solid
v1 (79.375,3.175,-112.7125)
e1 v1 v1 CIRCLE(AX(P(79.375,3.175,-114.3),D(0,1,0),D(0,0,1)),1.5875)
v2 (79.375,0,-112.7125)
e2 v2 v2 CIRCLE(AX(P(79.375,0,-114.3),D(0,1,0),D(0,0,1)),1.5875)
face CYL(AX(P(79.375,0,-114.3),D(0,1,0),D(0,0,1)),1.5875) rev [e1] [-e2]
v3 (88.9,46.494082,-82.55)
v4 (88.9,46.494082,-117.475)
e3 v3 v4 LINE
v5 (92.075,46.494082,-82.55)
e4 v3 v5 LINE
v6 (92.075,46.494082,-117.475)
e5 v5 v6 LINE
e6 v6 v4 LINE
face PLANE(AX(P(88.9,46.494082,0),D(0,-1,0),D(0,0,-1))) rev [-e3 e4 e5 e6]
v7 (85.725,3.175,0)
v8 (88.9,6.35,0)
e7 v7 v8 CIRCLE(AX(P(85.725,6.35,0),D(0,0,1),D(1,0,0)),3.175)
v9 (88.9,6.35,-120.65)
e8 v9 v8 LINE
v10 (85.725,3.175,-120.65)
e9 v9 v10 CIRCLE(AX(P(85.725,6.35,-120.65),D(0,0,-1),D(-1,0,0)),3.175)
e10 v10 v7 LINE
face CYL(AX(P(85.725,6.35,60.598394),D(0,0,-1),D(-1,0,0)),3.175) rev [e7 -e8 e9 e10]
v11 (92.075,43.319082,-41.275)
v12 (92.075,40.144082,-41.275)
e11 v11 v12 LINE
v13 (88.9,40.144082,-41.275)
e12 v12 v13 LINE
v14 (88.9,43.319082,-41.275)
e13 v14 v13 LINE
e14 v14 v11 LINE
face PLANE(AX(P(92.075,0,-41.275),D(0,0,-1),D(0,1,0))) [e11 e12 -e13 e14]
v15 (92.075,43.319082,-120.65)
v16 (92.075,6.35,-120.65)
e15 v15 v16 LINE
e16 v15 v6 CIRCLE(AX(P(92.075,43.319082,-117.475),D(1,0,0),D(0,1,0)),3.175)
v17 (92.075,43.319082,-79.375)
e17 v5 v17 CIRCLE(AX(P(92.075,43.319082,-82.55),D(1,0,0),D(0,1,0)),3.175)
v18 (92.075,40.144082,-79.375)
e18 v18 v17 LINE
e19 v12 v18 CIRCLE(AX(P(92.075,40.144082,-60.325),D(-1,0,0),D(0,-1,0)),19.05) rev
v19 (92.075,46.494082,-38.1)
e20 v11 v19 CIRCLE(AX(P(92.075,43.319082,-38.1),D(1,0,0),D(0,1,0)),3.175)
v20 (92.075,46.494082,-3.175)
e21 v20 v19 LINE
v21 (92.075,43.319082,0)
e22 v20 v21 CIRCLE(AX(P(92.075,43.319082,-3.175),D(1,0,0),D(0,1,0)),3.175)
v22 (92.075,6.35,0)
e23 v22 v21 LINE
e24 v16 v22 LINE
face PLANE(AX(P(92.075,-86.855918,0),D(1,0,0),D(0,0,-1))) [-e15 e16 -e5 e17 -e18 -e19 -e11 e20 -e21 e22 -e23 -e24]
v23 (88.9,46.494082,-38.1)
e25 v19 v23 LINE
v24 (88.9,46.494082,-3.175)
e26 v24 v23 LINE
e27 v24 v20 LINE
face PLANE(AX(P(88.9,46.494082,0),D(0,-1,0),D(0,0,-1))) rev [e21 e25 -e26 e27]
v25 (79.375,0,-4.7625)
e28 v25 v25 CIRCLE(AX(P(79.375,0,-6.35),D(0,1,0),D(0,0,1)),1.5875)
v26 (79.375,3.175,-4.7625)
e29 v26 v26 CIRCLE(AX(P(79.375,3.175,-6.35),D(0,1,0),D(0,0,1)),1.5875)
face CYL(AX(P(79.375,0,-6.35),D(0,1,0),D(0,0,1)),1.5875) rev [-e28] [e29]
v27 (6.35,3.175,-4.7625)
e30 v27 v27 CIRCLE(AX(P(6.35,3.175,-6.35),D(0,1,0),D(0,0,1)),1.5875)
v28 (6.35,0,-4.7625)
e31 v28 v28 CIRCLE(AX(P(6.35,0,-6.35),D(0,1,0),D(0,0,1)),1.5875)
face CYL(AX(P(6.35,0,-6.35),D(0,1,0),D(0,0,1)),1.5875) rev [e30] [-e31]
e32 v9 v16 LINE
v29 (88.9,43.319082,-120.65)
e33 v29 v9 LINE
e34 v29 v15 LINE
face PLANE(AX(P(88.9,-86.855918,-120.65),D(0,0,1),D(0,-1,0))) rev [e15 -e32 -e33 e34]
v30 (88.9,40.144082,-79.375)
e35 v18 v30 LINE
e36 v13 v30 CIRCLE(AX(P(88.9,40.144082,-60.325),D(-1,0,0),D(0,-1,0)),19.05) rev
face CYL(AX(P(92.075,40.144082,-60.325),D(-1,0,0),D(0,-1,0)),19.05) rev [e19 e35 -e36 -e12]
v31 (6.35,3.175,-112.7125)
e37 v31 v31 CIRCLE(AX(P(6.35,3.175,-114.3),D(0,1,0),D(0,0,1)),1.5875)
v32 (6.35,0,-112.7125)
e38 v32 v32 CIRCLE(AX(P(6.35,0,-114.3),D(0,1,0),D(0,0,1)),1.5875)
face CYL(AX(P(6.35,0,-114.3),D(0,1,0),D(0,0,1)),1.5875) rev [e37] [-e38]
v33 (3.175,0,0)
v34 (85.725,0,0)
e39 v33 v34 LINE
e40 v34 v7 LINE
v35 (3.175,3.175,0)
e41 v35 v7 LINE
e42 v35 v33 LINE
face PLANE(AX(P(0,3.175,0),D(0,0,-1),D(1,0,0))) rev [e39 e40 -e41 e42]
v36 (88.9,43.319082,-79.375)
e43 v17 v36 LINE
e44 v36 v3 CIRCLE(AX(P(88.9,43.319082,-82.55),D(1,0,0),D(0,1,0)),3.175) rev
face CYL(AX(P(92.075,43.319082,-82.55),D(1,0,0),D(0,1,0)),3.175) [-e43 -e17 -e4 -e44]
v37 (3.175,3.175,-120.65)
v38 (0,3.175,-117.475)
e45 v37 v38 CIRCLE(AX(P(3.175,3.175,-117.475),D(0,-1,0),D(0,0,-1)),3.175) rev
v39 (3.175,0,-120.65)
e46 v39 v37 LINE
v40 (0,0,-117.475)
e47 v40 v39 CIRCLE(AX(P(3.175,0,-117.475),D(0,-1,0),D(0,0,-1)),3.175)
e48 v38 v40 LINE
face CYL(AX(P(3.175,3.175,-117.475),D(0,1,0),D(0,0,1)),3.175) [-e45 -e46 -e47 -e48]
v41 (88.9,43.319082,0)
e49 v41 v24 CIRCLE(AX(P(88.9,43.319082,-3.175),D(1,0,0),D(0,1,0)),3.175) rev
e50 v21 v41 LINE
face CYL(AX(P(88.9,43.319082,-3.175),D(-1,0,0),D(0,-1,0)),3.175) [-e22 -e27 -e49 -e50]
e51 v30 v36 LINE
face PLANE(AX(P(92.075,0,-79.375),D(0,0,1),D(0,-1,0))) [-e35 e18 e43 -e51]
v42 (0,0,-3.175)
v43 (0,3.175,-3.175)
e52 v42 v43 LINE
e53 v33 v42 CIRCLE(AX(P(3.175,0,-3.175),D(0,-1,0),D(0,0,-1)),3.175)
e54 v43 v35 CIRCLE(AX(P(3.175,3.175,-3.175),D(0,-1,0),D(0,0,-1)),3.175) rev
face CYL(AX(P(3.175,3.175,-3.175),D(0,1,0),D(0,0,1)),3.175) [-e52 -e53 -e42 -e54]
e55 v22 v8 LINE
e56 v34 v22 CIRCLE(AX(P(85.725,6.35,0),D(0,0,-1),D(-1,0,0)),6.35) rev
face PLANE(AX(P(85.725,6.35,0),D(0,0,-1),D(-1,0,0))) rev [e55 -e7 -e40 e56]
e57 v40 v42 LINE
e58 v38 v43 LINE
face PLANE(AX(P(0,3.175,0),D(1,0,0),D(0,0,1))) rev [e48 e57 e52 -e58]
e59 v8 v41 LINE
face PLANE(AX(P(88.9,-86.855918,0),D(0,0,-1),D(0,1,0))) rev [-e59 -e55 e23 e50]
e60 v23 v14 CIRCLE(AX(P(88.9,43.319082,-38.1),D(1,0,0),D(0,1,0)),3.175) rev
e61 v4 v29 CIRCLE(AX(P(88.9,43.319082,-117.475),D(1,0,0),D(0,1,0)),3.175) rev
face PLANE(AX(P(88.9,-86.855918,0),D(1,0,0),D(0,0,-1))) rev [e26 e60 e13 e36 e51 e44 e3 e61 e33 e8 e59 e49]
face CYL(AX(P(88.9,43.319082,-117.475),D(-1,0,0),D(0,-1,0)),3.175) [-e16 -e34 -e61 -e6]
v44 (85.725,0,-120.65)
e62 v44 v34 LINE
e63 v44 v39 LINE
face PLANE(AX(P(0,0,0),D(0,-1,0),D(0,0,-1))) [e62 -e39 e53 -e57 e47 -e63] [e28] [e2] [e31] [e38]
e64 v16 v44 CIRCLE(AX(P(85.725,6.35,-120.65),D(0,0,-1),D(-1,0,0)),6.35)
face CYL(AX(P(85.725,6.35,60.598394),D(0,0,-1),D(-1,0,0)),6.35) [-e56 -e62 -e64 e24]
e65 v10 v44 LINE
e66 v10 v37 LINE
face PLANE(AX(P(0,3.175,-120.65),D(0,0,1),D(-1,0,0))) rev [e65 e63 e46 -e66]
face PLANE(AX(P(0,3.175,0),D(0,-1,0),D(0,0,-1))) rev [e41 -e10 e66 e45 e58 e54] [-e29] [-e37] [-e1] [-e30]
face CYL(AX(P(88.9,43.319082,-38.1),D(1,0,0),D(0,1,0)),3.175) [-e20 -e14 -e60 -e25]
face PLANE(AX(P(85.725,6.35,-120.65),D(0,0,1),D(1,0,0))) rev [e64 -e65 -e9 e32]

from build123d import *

# Parameters (mm, degrees)
SKETCH1_W              = 133.35
SKETCH1_H              = 120.65
BOSS_EXTRUDE1_DEPTH    = 3.175
SKETCHED_START         = -120.65
SKETCHED_BEND1_DEPTH   = 120.65
SKETCHED_BEND1_2_DEPTH = 120.65
CUT_EXTRUDE1_DEPTH     = 157.911861269
SKETCH9_R              = 1.5875
CUT_EXTRUDE2_DEPTH     = 158.831464015
FILLET1_R              = 3.175


# Read off the part's stored shape, not the designer's step: Sketched Bend1
with BuildPart() as part:
    # Sketch1 → Boss-Extrude1 (new body)
    with BuildSketch(Plane(origin=(0, 0, 0), x_dir=(1, 0, 0), z_dir=(0, 1, 0))):
        with Locations((66.675, 60.325)):
            Rectangle(SKETCH1_W, SKETCH1_H)
    extrude(amount=BOSS_EXTRUDE1_DEPTH)

    # Sketched Bend1 outline → Sketched Bend1 (cut)
    with BuildSketch(Plane.XY.offset(SKETCHED_START)):
        with BuildLine():
            Line((133.35, 3.175), (91.224261315, 3.175))
            ThreePointArc((91.224261315, 3.175), (88.900000001, 0.850738686), (85.725, 0))
            Line((85.725, 0), (133.35, 0))
            Line((133.35, 0), (133.35, 3.175))
        make_face()
    extrude(amount=SKETCHED_BEND1_DEPTH, mode=Mode.SUBTRACT)

    # Sketched Bend1 2 outline → Sketched Bend1 2 (add)
    with BuildSketch(Plane.XY.offset(SKETCHED_START)):
        with BuildLine():
            Line((88.9, 46.494082494), (88.9, 6.35))
            ThreePointArc((88.9, 6.35), (87.97006403, 4.10493597), (85.725, 3.175))
            Line((85.725, 3.175), (91.224261315, 3.175))
            ThreePointArc((91.224261315, 3.175), (91.858628997, 4.706499064), (92.075, 6.35))
            Line((92.075, 6.35), (92.075, 46.494082494))
            Line((92.075, 46.494082494), (88.9, 46.494082494))
        make_face()
    extrude(amount=SKETCHED_BEND1_2_DEPTH)

    # Sketch7 → Cut-Extrude1 (cut, through all)
    with BuildSketch(Plane.ZY.offset(-88.9)):
        with BuildLine():
            Line((-79.375, 46.494082494), (-79.375, 40.144082494))
            ThreePointArc((-79.375, 40.144082494), (-60.325, 21.094082494), (-41.275, 40.144082494))
            Line((-41.275, 40.144082494), (-41.275, 46.494082494))
            Line((-41.275, 46.494082494), (-79.375, 46.494082494))
        make_face()
    extrude(amount=-CUT_EXTRUDE1_DEPTH, mode=Mode.SUBTRACT)

    # Sketch9 → Cut-Extrude2 (cut, through all)
    with BuildSketch(Plane(origin=(0, 3.175, 0), x_dir=(1, 0, 0), z_dir=(0, 1, 0))):
        with Locations(Location((6.35, 114.3, 0), (0, 0, 270))):
            Circle(SKETCH9_R)
        with Locations(Location((79.375, 114.3, 0), (0, 0, 270))):
            Circle(SKETCH9_R)
        with Locations(Location((6.35, 6.35, 0), (0, 0, 270))):
            Circle(SKETCH9_R)
        with Locations(Location((79.375, 6.35, 0), (0, 0, 270))):
            Circle(SKETCH9_R)
    extrude(amount=-CUT_EXTRUDE2_DEPTH, mode=Mode.SUBTRACT)

    # Fillet1
    fillet1_edges = [part.edges().sort_by_distance(p)[0] for p in [
        (0, 1.5875, 0),
        (0, 1.5875, -120.65),
        (90.4875, 46.494082494, -79.375),
        (90.4875, 46.494082494, -41.275),
        (90.4875, 46.494082494, -120.65),
        (90.4875, 46.494082494, 0),
    ]]
    fillet(fillet1_edges, radius=FILLET1_R)


solid = part.part
